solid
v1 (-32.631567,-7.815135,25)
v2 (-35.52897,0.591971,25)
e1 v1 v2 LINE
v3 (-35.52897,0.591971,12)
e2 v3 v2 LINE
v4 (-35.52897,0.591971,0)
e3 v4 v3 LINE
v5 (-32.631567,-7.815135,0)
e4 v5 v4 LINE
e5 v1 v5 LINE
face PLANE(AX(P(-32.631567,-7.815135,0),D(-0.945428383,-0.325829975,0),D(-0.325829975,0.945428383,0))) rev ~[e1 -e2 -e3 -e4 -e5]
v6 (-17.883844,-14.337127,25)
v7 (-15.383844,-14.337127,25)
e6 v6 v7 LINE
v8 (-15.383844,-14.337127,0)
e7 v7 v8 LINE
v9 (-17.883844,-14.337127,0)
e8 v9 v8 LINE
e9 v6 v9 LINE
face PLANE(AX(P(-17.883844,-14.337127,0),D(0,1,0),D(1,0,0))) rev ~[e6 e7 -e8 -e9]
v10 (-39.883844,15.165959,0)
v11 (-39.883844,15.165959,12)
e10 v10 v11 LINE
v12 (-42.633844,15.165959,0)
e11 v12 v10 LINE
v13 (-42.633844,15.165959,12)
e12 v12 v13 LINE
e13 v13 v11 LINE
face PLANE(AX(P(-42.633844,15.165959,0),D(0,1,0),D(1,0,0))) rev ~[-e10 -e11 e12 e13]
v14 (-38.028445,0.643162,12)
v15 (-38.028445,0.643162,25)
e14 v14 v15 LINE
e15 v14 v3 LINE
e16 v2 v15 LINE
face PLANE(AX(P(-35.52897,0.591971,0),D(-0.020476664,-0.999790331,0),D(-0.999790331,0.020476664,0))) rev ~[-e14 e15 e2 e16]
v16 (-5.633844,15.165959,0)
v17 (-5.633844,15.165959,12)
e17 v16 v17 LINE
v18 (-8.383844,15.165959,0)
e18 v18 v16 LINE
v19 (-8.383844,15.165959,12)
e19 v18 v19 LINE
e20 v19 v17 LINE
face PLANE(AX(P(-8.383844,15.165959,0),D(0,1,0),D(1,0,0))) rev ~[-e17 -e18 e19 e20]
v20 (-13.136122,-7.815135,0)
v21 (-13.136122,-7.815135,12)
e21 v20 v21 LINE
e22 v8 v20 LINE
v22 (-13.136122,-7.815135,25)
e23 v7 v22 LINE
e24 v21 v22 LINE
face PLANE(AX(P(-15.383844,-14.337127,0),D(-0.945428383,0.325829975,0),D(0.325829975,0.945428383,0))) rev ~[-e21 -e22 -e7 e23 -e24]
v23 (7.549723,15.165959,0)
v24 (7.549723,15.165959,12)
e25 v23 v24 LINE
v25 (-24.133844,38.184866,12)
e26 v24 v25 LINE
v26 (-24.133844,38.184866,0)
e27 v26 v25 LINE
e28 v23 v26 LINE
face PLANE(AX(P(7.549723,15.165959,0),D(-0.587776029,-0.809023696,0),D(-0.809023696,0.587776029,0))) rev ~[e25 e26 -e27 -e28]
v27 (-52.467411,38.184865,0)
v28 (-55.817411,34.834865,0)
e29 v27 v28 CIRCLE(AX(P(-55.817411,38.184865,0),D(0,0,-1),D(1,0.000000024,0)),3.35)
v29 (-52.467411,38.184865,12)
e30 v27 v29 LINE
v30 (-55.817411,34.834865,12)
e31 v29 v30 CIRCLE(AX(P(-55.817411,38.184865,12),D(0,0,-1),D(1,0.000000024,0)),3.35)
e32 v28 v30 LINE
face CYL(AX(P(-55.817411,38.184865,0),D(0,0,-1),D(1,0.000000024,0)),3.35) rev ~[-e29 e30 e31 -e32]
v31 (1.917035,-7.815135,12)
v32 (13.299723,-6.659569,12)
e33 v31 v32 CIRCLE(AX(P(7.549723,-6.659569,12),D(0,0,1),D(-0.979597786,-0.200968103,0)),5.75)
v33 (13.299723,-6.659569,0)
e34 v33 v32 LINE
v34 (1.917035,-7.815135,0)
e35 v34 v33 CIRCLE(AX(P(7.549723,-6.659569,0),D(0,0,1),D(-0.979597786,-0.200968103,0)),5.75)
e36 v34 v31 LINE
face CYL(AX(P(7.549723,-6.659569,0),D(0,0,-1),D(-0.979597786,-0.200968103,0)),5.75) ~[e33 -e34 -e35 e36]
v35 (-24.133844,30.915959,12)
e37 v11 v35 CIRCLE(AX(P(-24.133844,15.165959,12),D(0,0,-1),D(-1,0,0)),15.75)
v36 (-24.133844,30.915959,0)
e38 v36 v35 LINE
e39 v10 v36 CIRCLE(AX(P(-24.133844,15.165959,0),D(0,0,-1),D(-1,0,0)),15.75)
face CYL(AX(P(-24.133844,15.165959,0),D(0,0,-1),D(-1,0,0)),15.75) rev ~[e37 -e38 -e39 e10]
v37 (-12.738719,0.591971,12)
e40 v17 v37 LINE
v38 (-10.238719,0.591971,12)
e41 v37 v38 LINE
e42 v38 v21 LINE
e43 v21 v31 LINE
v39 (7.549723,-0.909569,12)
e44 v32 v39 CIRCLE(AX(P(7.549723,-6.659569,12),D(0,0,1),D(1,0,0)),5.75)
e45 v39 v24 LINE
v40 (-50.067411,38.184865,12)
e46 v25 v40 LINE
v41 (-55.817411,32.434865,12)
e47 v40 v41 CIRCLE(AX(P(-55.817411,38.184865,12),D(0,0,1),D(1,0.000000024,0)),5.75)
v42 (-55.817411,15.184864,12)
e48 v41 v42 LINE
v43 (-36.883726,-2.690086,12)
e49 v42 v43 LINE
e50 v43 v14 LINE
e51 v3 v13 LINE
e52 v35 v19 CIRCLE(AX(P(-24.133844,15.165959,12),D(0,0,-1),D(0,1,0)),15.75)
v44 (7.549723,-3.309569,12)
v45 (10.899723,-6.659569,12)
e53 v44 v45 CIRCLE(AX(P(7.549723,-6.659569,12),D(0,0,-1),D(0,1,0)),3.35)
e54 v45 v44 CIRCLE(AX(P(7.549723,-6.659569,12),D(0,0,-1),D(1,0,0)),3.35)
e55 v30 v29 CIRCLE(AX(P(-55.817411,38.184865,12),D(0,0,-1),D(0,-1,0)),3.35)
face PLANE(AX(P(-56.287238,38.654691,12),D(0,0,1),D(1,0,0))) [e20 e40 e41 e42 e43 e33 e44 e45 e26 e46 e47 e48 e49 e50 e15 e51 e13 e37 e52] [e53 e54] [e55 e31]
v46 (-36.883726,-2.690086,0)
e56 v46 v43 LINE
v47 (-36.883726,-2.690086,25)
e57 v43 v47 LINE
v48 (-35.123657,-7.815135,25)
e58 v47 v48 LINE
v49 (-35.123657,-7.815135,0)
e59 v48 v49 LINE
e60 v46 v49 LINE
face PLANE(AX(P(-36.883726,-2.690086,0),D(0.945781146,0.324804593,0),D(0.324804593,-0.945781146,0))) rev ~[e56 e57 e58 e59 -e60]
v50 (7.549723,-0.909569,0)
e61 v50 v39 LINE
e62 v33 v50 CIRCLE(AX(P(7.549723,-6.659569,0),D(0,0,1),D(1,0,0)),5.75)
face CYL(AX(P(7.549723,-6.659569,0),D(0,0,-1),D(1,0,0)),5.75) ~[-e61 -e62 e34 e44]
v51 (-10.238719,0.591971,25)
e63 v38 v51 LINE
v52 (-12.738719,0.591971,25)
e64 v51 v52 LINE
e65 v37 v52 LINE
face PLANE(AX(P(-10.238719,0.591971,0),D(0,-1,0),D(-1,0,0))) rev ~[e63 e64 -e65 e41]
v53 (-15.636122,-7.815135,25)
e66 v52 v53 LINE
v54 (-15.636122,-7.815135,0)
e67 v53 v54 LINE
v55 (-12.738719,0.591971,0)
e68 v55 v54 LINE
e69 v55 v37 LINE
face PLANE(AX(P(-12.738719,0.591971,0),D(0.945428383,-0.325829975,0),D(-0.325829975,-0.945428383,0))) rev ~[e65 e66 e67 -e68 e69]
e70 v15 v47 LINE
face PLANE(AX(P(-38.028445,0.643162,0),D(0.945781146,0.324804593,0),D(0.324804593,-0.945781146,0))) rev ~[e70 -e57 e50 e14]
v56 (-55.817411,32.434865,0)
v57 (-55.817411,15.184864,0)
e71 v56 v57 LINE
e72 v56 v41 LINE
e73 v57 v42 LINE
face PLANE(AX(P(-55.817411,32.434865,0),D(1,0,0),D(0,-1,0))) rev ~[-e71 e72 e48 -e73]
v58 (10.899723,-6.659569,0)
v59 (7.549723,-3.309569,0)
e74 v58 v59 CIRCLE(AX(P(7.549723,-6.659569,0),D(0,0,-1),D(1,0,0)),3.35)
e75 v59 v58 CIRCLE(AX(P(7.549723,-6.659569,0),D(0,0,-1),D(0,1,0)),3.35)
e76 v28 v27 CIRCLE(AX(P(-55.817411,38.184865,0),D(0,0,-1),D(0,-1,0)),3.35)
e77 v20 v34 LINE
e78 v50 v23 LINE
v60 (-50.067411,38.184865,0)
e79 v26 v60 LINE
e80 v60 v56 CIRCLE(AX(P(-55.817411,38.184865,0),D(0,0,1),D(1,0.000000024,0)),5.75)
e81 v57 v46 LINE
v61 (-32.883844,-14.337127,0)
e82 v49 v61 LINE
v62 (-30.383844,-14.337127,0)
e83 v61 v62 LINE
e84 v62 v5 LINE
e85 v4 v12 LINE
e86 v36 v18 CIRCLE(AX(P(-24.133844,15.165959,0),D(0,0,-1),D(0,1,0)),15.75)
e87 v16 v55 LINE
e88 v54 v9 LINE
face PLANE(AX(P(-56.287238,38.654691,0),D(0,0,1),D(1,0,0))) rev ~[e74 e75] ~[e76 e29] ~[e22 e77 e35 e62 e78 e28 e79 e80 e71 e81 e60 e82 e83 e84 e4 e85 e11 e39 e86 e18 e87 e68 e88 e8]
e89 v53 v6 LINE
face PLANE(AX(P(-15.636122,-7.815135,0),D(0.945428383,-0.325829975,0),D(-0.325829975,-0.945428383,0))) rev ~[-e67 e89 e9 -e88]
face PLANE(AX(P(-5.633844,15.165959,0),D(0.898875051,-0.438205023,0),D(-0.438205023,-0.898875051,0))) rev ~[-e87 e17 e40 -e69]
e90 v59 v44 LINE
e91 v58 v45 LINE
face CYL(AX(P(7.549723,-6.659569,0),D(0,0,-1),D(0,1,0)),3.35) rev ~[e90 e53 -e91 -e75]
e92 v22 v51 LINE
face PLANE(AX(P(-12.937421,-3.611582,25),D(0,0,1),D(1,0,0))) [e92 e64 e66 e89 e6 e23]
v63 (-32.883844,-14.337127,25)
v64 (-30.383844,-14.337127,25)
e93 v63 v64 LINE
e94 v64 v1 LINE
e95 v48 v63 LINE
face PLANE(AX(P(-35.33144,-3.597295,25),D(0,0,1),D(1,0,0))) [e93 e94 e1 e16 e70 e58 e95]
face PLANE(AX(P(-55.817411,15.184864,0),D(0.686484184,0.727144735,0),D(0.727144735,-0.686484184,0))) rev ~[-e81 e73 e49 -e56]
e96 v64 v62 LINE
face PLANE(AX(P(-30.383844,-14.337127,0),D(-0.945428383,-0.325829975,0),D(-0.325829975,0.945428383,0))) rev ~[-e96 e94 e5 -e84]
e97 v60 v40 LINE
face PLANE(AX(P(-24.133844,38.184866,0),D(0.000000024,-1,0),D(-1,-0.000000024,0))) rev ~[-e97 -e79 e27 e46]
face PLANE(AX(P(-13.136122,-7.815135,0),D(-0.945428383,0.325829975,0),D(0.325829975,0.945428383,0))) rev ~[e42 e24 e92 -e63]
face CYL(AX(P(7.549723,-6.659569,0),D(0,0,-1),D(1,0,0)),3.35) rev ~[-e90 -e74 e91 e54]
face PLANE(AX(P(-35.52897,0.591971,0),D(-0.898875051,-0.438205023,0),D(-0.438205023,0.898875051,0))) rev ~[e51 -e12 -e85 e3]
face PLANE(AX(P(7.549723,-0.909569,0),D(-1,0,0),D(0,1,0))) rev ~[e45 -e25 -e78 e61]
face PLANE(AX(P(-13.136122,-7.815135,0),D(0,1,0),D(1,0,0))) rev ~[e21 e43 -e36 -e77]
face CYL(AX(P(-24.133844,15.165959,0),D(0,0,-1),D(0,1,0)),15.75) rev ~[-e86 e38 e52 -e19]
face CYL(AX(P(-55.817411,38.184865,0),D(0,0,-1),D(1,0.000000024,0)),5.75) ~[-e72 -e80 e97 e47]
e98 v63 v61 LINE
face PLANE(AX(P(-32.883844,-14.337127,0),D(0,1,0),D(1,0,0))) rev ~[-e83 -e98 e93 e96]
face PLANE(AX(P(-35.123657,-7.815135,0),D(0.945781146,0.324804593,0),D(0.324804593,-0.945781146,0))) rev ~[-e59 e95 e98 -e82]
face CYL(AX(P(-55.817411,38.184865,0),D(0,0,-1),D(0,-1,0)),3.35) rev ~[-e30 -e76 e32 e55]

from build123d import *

# Parameters (mm, degrees)
F1_DEPTH = 12
F2_DEPTH = 25


# Not quite as in the source:
# - ends of sketch curves that miss each other by under 0.0002 mm in the source are joined


with BuildPart() as f1:
    # F0 (on Top) → F1 (new body)
    with BuildSketch(Plane.XY):
        with BuildLine():
            ThreePointArc((-55.8174114415, 34.8348648238), (-58.1862191586, 40.5536725408), (-52.4674114416, 38.1848648238))
            Line((-52.4674114416, 38.1848648238), (-50.0674114416, 38.1848649627))
            ThreePointArc((-50.0674114416, 38.1848649627), (-59.8832754334, 42.2507288156), (-55.8174114415, 32.4348648238))
            Line((-55.8174114415, 32.4348648238), (-55.8174114415, 34.8348648238))
        make_face()
        with BuildLine():
            Line((-50.0674114416, 38.1848649627), (-52.4674114416, 38.1848649047))
            ThreePointArc((-52.4674114416, 38.1848649047), (-53.4486037246, 35.8160571069), (-55.8174114415, 34.8348648238))
            Line((-55.8174114415, 34.8348648238), (-55.8174114415, 32.4348648238))
            ThreePointArc((-55.8174114415, 32.4348648238), (-51.7515474497, 34.119000832), (-50.0674114416, 38.1848649627))
        make_face()
        with BuildLine():
            Line((-24.1338443596, 38.184865589), (-50.0674114416, 38.1848649627))
            ThreePointArc((-50.0674114416, 38.1848649627), (-51.7515474497, 34.119000832), (-55.8174114415, 32.4348648238))
            Line((-55.8174114415, 32.4348648238), (-55.8174114412, 15.1848640586))
            Line((-55.8174114412, 15.1848640586), (-42.6338443592, 15.1659585535))
            ThreePointArc((-42.6338443592, 15.1659585535), (-37.2153198113, 28.2474340054), (-24.1338443595, 33.6659585535))
            Line((-24.1338443595, 33.6659585535), (-24.1338443596, 38.184865589))
        make_face()
        with BuildLine():
            Line((-24.1338443595, 30.9159585535), (-24.1338443595, 33.6659585535))
            ThreePointArc((-24.1338443595, 33.6659585535), (-37.2153198113, 28.2474340054), (-42.6338443592, 15.1659585535))
            Line((-42.6338443592, 15.1659585535), (-39.8838443592, 15.1659585535))
            ThreePointArc((-39.8838443592, 15.1659585535), (-35.270776163, 26.3028903571), (-24.1338443595, 30.9159585535))
        make_face()
        with BuildLine():
            Line((7.5497227227, 15.1659585535), (-24.1338443596, 38.184865589))
            Line((-24.1338443596, 38.184865589), (-24.1338443595, 33.6659585535))
            ThreePointArc((-24.1338443595, 33.6659585535), (-11.0523689074, 28.2474340056), (-5.6338443592, 15.1659585535))
            Line((-5.6338443592, 15.1659585535), (7.5497227227, 15.1659585535))
        make_face()
        with BuildLine():
            ThreePointArc((-5.6338443592, 15.1659585535), (-11.0523689074, 28.2474340056), (-24.1338443595, 33.6659585535))
            Line((-24.1338443595, 33.6659585535), (-24.1338443595, 30.9159585535))
            ThreePointArc((-24.1338443595, 30.9159585535), (-12.9969125556, 26.3028903573), (-8.3838443592, 15.1659585535))
            Line((-8.3838443592, 15.1659585535), (-5.6338443592, 15.1659585535))
        make_face()
        with BuildLine():
            Line((7.549722723, -0.909568585), (7.5497227227, 15.1659585535))
            Line((7.5497227227, 15.1659585535), (-5.6338443592, 15.1659585535))
            Line((-5.6338443592, 15.1659585535), (-12.7387191109, 0.5919707473))
            Line((-12.7387191109, 0.5919707473), (-10.2387191109, 0.5919707473))
            Line((-10.2387191109, 0.5919707473), (-13.136122196, -7.8151351762))
            Line((-13.136122196, -7.8151351762), (1.9170354556, -7.8151351762))
            ThreePointArc((1.9170354556, -7.8151351762), (3.0939956275, -3.0251503303), (7.549722723, -0.909568585))
        make_face()
        Polygon((-42.6338443592, 15.1659585535), (-55.8174114412, 15.1848640586), (-36.8837256357, -2.690086035), (-38.0284454354, 0.643162408), (-35.5289696075, 0.5919707473), align=None)
        with BuildLine():
            ThreePointArc((13.2997227231, -6.659568585), (11.6155867149, -2.5937045931), (7.549722723, -0.909568585))
            ThreePointArc((7.549722723, -0.909568585), (3.0939956275, -3.0251503303), (1.9170354556, -7.8151351762))
            ThreePointArc((1.9170354556, -7.8151351762), (8.1304757738, -12.3801652229), (13.2997227231, -6.659568585))
        make_face()
        with BuildLine():
            ThreePointArc((10.8997227231, -6.659568585), (5.1809150061, -9.028376302), (7.549722723, -3.309568585))
            ThreePointArc((7.549722723, -3.309568585), (9.91853044, -4.290760868), (10.8997227231, -6.659568585))
        make_face(mode=Mode.SUBTRACT)
        Polygon((-38.0284454354, 0.643162408), (-36.8837256357, -2.690086035), (-35.1236572441, -7.8151351762), (-32.6315665225, -7.8151351762), (-35.5289696075, 0.5919707473), align=None)
        Polygon((-32.6315665225, -7.8151351762), (-35.1236572441, -7.8151351762), (-32.8838443592, -14.3371266833), (-30.3838443592, -14.3371266833), align=None)
        Polygon((-13.136122196, -7.8151351762), (-15.636122196, -7.8151351762), (-17.8838443592, -14.3371266833), (-15.3838443592, -14.3371266833), align=None)
        Polygon((-10.2387191109, 0.5919707473), (-12.7387191109, 0.5919707473), (-15.636122196, -7.8151351762), (-13.136122196, -7.8151351762), align=None)
    extrude(amount=F1_DEPTH)

    # F0 (on Top) → F2 (join)
    with BuildSketch(Plane.XY):
        Polygon((-38.0284454354, 0.643162408), (-36.8837256357, -2.690086035), (-35.1236572441, -7.8151351762), (-32.6315665225, -7.8151351762), (-35.5289696075, 0.5919707473), align=None)
        Polygon((-32.6315665225, -7.8151351762), (-35.1236572441, -7.8151351762), (-32.8838443592, -14.3371266833), (-30.3838443592, -14.3371266833), align=None)
        Polygon((-10.2387191109, 0.5919707473), (-12.7387191109, 0.5919707473), (-15.636122196, -7.8151351762), (-13.136122196, -7.8151351762), align=None)
        Polygon((-13.136122196, -7.8151351762), (-15.636122196, -7.8151351762), (-17.8838443592, -14.3371266833), (-15.3838443592, -14.3371266833), align=None)
    extrude(amount=F2_DEPTH)


solid = f1.part
